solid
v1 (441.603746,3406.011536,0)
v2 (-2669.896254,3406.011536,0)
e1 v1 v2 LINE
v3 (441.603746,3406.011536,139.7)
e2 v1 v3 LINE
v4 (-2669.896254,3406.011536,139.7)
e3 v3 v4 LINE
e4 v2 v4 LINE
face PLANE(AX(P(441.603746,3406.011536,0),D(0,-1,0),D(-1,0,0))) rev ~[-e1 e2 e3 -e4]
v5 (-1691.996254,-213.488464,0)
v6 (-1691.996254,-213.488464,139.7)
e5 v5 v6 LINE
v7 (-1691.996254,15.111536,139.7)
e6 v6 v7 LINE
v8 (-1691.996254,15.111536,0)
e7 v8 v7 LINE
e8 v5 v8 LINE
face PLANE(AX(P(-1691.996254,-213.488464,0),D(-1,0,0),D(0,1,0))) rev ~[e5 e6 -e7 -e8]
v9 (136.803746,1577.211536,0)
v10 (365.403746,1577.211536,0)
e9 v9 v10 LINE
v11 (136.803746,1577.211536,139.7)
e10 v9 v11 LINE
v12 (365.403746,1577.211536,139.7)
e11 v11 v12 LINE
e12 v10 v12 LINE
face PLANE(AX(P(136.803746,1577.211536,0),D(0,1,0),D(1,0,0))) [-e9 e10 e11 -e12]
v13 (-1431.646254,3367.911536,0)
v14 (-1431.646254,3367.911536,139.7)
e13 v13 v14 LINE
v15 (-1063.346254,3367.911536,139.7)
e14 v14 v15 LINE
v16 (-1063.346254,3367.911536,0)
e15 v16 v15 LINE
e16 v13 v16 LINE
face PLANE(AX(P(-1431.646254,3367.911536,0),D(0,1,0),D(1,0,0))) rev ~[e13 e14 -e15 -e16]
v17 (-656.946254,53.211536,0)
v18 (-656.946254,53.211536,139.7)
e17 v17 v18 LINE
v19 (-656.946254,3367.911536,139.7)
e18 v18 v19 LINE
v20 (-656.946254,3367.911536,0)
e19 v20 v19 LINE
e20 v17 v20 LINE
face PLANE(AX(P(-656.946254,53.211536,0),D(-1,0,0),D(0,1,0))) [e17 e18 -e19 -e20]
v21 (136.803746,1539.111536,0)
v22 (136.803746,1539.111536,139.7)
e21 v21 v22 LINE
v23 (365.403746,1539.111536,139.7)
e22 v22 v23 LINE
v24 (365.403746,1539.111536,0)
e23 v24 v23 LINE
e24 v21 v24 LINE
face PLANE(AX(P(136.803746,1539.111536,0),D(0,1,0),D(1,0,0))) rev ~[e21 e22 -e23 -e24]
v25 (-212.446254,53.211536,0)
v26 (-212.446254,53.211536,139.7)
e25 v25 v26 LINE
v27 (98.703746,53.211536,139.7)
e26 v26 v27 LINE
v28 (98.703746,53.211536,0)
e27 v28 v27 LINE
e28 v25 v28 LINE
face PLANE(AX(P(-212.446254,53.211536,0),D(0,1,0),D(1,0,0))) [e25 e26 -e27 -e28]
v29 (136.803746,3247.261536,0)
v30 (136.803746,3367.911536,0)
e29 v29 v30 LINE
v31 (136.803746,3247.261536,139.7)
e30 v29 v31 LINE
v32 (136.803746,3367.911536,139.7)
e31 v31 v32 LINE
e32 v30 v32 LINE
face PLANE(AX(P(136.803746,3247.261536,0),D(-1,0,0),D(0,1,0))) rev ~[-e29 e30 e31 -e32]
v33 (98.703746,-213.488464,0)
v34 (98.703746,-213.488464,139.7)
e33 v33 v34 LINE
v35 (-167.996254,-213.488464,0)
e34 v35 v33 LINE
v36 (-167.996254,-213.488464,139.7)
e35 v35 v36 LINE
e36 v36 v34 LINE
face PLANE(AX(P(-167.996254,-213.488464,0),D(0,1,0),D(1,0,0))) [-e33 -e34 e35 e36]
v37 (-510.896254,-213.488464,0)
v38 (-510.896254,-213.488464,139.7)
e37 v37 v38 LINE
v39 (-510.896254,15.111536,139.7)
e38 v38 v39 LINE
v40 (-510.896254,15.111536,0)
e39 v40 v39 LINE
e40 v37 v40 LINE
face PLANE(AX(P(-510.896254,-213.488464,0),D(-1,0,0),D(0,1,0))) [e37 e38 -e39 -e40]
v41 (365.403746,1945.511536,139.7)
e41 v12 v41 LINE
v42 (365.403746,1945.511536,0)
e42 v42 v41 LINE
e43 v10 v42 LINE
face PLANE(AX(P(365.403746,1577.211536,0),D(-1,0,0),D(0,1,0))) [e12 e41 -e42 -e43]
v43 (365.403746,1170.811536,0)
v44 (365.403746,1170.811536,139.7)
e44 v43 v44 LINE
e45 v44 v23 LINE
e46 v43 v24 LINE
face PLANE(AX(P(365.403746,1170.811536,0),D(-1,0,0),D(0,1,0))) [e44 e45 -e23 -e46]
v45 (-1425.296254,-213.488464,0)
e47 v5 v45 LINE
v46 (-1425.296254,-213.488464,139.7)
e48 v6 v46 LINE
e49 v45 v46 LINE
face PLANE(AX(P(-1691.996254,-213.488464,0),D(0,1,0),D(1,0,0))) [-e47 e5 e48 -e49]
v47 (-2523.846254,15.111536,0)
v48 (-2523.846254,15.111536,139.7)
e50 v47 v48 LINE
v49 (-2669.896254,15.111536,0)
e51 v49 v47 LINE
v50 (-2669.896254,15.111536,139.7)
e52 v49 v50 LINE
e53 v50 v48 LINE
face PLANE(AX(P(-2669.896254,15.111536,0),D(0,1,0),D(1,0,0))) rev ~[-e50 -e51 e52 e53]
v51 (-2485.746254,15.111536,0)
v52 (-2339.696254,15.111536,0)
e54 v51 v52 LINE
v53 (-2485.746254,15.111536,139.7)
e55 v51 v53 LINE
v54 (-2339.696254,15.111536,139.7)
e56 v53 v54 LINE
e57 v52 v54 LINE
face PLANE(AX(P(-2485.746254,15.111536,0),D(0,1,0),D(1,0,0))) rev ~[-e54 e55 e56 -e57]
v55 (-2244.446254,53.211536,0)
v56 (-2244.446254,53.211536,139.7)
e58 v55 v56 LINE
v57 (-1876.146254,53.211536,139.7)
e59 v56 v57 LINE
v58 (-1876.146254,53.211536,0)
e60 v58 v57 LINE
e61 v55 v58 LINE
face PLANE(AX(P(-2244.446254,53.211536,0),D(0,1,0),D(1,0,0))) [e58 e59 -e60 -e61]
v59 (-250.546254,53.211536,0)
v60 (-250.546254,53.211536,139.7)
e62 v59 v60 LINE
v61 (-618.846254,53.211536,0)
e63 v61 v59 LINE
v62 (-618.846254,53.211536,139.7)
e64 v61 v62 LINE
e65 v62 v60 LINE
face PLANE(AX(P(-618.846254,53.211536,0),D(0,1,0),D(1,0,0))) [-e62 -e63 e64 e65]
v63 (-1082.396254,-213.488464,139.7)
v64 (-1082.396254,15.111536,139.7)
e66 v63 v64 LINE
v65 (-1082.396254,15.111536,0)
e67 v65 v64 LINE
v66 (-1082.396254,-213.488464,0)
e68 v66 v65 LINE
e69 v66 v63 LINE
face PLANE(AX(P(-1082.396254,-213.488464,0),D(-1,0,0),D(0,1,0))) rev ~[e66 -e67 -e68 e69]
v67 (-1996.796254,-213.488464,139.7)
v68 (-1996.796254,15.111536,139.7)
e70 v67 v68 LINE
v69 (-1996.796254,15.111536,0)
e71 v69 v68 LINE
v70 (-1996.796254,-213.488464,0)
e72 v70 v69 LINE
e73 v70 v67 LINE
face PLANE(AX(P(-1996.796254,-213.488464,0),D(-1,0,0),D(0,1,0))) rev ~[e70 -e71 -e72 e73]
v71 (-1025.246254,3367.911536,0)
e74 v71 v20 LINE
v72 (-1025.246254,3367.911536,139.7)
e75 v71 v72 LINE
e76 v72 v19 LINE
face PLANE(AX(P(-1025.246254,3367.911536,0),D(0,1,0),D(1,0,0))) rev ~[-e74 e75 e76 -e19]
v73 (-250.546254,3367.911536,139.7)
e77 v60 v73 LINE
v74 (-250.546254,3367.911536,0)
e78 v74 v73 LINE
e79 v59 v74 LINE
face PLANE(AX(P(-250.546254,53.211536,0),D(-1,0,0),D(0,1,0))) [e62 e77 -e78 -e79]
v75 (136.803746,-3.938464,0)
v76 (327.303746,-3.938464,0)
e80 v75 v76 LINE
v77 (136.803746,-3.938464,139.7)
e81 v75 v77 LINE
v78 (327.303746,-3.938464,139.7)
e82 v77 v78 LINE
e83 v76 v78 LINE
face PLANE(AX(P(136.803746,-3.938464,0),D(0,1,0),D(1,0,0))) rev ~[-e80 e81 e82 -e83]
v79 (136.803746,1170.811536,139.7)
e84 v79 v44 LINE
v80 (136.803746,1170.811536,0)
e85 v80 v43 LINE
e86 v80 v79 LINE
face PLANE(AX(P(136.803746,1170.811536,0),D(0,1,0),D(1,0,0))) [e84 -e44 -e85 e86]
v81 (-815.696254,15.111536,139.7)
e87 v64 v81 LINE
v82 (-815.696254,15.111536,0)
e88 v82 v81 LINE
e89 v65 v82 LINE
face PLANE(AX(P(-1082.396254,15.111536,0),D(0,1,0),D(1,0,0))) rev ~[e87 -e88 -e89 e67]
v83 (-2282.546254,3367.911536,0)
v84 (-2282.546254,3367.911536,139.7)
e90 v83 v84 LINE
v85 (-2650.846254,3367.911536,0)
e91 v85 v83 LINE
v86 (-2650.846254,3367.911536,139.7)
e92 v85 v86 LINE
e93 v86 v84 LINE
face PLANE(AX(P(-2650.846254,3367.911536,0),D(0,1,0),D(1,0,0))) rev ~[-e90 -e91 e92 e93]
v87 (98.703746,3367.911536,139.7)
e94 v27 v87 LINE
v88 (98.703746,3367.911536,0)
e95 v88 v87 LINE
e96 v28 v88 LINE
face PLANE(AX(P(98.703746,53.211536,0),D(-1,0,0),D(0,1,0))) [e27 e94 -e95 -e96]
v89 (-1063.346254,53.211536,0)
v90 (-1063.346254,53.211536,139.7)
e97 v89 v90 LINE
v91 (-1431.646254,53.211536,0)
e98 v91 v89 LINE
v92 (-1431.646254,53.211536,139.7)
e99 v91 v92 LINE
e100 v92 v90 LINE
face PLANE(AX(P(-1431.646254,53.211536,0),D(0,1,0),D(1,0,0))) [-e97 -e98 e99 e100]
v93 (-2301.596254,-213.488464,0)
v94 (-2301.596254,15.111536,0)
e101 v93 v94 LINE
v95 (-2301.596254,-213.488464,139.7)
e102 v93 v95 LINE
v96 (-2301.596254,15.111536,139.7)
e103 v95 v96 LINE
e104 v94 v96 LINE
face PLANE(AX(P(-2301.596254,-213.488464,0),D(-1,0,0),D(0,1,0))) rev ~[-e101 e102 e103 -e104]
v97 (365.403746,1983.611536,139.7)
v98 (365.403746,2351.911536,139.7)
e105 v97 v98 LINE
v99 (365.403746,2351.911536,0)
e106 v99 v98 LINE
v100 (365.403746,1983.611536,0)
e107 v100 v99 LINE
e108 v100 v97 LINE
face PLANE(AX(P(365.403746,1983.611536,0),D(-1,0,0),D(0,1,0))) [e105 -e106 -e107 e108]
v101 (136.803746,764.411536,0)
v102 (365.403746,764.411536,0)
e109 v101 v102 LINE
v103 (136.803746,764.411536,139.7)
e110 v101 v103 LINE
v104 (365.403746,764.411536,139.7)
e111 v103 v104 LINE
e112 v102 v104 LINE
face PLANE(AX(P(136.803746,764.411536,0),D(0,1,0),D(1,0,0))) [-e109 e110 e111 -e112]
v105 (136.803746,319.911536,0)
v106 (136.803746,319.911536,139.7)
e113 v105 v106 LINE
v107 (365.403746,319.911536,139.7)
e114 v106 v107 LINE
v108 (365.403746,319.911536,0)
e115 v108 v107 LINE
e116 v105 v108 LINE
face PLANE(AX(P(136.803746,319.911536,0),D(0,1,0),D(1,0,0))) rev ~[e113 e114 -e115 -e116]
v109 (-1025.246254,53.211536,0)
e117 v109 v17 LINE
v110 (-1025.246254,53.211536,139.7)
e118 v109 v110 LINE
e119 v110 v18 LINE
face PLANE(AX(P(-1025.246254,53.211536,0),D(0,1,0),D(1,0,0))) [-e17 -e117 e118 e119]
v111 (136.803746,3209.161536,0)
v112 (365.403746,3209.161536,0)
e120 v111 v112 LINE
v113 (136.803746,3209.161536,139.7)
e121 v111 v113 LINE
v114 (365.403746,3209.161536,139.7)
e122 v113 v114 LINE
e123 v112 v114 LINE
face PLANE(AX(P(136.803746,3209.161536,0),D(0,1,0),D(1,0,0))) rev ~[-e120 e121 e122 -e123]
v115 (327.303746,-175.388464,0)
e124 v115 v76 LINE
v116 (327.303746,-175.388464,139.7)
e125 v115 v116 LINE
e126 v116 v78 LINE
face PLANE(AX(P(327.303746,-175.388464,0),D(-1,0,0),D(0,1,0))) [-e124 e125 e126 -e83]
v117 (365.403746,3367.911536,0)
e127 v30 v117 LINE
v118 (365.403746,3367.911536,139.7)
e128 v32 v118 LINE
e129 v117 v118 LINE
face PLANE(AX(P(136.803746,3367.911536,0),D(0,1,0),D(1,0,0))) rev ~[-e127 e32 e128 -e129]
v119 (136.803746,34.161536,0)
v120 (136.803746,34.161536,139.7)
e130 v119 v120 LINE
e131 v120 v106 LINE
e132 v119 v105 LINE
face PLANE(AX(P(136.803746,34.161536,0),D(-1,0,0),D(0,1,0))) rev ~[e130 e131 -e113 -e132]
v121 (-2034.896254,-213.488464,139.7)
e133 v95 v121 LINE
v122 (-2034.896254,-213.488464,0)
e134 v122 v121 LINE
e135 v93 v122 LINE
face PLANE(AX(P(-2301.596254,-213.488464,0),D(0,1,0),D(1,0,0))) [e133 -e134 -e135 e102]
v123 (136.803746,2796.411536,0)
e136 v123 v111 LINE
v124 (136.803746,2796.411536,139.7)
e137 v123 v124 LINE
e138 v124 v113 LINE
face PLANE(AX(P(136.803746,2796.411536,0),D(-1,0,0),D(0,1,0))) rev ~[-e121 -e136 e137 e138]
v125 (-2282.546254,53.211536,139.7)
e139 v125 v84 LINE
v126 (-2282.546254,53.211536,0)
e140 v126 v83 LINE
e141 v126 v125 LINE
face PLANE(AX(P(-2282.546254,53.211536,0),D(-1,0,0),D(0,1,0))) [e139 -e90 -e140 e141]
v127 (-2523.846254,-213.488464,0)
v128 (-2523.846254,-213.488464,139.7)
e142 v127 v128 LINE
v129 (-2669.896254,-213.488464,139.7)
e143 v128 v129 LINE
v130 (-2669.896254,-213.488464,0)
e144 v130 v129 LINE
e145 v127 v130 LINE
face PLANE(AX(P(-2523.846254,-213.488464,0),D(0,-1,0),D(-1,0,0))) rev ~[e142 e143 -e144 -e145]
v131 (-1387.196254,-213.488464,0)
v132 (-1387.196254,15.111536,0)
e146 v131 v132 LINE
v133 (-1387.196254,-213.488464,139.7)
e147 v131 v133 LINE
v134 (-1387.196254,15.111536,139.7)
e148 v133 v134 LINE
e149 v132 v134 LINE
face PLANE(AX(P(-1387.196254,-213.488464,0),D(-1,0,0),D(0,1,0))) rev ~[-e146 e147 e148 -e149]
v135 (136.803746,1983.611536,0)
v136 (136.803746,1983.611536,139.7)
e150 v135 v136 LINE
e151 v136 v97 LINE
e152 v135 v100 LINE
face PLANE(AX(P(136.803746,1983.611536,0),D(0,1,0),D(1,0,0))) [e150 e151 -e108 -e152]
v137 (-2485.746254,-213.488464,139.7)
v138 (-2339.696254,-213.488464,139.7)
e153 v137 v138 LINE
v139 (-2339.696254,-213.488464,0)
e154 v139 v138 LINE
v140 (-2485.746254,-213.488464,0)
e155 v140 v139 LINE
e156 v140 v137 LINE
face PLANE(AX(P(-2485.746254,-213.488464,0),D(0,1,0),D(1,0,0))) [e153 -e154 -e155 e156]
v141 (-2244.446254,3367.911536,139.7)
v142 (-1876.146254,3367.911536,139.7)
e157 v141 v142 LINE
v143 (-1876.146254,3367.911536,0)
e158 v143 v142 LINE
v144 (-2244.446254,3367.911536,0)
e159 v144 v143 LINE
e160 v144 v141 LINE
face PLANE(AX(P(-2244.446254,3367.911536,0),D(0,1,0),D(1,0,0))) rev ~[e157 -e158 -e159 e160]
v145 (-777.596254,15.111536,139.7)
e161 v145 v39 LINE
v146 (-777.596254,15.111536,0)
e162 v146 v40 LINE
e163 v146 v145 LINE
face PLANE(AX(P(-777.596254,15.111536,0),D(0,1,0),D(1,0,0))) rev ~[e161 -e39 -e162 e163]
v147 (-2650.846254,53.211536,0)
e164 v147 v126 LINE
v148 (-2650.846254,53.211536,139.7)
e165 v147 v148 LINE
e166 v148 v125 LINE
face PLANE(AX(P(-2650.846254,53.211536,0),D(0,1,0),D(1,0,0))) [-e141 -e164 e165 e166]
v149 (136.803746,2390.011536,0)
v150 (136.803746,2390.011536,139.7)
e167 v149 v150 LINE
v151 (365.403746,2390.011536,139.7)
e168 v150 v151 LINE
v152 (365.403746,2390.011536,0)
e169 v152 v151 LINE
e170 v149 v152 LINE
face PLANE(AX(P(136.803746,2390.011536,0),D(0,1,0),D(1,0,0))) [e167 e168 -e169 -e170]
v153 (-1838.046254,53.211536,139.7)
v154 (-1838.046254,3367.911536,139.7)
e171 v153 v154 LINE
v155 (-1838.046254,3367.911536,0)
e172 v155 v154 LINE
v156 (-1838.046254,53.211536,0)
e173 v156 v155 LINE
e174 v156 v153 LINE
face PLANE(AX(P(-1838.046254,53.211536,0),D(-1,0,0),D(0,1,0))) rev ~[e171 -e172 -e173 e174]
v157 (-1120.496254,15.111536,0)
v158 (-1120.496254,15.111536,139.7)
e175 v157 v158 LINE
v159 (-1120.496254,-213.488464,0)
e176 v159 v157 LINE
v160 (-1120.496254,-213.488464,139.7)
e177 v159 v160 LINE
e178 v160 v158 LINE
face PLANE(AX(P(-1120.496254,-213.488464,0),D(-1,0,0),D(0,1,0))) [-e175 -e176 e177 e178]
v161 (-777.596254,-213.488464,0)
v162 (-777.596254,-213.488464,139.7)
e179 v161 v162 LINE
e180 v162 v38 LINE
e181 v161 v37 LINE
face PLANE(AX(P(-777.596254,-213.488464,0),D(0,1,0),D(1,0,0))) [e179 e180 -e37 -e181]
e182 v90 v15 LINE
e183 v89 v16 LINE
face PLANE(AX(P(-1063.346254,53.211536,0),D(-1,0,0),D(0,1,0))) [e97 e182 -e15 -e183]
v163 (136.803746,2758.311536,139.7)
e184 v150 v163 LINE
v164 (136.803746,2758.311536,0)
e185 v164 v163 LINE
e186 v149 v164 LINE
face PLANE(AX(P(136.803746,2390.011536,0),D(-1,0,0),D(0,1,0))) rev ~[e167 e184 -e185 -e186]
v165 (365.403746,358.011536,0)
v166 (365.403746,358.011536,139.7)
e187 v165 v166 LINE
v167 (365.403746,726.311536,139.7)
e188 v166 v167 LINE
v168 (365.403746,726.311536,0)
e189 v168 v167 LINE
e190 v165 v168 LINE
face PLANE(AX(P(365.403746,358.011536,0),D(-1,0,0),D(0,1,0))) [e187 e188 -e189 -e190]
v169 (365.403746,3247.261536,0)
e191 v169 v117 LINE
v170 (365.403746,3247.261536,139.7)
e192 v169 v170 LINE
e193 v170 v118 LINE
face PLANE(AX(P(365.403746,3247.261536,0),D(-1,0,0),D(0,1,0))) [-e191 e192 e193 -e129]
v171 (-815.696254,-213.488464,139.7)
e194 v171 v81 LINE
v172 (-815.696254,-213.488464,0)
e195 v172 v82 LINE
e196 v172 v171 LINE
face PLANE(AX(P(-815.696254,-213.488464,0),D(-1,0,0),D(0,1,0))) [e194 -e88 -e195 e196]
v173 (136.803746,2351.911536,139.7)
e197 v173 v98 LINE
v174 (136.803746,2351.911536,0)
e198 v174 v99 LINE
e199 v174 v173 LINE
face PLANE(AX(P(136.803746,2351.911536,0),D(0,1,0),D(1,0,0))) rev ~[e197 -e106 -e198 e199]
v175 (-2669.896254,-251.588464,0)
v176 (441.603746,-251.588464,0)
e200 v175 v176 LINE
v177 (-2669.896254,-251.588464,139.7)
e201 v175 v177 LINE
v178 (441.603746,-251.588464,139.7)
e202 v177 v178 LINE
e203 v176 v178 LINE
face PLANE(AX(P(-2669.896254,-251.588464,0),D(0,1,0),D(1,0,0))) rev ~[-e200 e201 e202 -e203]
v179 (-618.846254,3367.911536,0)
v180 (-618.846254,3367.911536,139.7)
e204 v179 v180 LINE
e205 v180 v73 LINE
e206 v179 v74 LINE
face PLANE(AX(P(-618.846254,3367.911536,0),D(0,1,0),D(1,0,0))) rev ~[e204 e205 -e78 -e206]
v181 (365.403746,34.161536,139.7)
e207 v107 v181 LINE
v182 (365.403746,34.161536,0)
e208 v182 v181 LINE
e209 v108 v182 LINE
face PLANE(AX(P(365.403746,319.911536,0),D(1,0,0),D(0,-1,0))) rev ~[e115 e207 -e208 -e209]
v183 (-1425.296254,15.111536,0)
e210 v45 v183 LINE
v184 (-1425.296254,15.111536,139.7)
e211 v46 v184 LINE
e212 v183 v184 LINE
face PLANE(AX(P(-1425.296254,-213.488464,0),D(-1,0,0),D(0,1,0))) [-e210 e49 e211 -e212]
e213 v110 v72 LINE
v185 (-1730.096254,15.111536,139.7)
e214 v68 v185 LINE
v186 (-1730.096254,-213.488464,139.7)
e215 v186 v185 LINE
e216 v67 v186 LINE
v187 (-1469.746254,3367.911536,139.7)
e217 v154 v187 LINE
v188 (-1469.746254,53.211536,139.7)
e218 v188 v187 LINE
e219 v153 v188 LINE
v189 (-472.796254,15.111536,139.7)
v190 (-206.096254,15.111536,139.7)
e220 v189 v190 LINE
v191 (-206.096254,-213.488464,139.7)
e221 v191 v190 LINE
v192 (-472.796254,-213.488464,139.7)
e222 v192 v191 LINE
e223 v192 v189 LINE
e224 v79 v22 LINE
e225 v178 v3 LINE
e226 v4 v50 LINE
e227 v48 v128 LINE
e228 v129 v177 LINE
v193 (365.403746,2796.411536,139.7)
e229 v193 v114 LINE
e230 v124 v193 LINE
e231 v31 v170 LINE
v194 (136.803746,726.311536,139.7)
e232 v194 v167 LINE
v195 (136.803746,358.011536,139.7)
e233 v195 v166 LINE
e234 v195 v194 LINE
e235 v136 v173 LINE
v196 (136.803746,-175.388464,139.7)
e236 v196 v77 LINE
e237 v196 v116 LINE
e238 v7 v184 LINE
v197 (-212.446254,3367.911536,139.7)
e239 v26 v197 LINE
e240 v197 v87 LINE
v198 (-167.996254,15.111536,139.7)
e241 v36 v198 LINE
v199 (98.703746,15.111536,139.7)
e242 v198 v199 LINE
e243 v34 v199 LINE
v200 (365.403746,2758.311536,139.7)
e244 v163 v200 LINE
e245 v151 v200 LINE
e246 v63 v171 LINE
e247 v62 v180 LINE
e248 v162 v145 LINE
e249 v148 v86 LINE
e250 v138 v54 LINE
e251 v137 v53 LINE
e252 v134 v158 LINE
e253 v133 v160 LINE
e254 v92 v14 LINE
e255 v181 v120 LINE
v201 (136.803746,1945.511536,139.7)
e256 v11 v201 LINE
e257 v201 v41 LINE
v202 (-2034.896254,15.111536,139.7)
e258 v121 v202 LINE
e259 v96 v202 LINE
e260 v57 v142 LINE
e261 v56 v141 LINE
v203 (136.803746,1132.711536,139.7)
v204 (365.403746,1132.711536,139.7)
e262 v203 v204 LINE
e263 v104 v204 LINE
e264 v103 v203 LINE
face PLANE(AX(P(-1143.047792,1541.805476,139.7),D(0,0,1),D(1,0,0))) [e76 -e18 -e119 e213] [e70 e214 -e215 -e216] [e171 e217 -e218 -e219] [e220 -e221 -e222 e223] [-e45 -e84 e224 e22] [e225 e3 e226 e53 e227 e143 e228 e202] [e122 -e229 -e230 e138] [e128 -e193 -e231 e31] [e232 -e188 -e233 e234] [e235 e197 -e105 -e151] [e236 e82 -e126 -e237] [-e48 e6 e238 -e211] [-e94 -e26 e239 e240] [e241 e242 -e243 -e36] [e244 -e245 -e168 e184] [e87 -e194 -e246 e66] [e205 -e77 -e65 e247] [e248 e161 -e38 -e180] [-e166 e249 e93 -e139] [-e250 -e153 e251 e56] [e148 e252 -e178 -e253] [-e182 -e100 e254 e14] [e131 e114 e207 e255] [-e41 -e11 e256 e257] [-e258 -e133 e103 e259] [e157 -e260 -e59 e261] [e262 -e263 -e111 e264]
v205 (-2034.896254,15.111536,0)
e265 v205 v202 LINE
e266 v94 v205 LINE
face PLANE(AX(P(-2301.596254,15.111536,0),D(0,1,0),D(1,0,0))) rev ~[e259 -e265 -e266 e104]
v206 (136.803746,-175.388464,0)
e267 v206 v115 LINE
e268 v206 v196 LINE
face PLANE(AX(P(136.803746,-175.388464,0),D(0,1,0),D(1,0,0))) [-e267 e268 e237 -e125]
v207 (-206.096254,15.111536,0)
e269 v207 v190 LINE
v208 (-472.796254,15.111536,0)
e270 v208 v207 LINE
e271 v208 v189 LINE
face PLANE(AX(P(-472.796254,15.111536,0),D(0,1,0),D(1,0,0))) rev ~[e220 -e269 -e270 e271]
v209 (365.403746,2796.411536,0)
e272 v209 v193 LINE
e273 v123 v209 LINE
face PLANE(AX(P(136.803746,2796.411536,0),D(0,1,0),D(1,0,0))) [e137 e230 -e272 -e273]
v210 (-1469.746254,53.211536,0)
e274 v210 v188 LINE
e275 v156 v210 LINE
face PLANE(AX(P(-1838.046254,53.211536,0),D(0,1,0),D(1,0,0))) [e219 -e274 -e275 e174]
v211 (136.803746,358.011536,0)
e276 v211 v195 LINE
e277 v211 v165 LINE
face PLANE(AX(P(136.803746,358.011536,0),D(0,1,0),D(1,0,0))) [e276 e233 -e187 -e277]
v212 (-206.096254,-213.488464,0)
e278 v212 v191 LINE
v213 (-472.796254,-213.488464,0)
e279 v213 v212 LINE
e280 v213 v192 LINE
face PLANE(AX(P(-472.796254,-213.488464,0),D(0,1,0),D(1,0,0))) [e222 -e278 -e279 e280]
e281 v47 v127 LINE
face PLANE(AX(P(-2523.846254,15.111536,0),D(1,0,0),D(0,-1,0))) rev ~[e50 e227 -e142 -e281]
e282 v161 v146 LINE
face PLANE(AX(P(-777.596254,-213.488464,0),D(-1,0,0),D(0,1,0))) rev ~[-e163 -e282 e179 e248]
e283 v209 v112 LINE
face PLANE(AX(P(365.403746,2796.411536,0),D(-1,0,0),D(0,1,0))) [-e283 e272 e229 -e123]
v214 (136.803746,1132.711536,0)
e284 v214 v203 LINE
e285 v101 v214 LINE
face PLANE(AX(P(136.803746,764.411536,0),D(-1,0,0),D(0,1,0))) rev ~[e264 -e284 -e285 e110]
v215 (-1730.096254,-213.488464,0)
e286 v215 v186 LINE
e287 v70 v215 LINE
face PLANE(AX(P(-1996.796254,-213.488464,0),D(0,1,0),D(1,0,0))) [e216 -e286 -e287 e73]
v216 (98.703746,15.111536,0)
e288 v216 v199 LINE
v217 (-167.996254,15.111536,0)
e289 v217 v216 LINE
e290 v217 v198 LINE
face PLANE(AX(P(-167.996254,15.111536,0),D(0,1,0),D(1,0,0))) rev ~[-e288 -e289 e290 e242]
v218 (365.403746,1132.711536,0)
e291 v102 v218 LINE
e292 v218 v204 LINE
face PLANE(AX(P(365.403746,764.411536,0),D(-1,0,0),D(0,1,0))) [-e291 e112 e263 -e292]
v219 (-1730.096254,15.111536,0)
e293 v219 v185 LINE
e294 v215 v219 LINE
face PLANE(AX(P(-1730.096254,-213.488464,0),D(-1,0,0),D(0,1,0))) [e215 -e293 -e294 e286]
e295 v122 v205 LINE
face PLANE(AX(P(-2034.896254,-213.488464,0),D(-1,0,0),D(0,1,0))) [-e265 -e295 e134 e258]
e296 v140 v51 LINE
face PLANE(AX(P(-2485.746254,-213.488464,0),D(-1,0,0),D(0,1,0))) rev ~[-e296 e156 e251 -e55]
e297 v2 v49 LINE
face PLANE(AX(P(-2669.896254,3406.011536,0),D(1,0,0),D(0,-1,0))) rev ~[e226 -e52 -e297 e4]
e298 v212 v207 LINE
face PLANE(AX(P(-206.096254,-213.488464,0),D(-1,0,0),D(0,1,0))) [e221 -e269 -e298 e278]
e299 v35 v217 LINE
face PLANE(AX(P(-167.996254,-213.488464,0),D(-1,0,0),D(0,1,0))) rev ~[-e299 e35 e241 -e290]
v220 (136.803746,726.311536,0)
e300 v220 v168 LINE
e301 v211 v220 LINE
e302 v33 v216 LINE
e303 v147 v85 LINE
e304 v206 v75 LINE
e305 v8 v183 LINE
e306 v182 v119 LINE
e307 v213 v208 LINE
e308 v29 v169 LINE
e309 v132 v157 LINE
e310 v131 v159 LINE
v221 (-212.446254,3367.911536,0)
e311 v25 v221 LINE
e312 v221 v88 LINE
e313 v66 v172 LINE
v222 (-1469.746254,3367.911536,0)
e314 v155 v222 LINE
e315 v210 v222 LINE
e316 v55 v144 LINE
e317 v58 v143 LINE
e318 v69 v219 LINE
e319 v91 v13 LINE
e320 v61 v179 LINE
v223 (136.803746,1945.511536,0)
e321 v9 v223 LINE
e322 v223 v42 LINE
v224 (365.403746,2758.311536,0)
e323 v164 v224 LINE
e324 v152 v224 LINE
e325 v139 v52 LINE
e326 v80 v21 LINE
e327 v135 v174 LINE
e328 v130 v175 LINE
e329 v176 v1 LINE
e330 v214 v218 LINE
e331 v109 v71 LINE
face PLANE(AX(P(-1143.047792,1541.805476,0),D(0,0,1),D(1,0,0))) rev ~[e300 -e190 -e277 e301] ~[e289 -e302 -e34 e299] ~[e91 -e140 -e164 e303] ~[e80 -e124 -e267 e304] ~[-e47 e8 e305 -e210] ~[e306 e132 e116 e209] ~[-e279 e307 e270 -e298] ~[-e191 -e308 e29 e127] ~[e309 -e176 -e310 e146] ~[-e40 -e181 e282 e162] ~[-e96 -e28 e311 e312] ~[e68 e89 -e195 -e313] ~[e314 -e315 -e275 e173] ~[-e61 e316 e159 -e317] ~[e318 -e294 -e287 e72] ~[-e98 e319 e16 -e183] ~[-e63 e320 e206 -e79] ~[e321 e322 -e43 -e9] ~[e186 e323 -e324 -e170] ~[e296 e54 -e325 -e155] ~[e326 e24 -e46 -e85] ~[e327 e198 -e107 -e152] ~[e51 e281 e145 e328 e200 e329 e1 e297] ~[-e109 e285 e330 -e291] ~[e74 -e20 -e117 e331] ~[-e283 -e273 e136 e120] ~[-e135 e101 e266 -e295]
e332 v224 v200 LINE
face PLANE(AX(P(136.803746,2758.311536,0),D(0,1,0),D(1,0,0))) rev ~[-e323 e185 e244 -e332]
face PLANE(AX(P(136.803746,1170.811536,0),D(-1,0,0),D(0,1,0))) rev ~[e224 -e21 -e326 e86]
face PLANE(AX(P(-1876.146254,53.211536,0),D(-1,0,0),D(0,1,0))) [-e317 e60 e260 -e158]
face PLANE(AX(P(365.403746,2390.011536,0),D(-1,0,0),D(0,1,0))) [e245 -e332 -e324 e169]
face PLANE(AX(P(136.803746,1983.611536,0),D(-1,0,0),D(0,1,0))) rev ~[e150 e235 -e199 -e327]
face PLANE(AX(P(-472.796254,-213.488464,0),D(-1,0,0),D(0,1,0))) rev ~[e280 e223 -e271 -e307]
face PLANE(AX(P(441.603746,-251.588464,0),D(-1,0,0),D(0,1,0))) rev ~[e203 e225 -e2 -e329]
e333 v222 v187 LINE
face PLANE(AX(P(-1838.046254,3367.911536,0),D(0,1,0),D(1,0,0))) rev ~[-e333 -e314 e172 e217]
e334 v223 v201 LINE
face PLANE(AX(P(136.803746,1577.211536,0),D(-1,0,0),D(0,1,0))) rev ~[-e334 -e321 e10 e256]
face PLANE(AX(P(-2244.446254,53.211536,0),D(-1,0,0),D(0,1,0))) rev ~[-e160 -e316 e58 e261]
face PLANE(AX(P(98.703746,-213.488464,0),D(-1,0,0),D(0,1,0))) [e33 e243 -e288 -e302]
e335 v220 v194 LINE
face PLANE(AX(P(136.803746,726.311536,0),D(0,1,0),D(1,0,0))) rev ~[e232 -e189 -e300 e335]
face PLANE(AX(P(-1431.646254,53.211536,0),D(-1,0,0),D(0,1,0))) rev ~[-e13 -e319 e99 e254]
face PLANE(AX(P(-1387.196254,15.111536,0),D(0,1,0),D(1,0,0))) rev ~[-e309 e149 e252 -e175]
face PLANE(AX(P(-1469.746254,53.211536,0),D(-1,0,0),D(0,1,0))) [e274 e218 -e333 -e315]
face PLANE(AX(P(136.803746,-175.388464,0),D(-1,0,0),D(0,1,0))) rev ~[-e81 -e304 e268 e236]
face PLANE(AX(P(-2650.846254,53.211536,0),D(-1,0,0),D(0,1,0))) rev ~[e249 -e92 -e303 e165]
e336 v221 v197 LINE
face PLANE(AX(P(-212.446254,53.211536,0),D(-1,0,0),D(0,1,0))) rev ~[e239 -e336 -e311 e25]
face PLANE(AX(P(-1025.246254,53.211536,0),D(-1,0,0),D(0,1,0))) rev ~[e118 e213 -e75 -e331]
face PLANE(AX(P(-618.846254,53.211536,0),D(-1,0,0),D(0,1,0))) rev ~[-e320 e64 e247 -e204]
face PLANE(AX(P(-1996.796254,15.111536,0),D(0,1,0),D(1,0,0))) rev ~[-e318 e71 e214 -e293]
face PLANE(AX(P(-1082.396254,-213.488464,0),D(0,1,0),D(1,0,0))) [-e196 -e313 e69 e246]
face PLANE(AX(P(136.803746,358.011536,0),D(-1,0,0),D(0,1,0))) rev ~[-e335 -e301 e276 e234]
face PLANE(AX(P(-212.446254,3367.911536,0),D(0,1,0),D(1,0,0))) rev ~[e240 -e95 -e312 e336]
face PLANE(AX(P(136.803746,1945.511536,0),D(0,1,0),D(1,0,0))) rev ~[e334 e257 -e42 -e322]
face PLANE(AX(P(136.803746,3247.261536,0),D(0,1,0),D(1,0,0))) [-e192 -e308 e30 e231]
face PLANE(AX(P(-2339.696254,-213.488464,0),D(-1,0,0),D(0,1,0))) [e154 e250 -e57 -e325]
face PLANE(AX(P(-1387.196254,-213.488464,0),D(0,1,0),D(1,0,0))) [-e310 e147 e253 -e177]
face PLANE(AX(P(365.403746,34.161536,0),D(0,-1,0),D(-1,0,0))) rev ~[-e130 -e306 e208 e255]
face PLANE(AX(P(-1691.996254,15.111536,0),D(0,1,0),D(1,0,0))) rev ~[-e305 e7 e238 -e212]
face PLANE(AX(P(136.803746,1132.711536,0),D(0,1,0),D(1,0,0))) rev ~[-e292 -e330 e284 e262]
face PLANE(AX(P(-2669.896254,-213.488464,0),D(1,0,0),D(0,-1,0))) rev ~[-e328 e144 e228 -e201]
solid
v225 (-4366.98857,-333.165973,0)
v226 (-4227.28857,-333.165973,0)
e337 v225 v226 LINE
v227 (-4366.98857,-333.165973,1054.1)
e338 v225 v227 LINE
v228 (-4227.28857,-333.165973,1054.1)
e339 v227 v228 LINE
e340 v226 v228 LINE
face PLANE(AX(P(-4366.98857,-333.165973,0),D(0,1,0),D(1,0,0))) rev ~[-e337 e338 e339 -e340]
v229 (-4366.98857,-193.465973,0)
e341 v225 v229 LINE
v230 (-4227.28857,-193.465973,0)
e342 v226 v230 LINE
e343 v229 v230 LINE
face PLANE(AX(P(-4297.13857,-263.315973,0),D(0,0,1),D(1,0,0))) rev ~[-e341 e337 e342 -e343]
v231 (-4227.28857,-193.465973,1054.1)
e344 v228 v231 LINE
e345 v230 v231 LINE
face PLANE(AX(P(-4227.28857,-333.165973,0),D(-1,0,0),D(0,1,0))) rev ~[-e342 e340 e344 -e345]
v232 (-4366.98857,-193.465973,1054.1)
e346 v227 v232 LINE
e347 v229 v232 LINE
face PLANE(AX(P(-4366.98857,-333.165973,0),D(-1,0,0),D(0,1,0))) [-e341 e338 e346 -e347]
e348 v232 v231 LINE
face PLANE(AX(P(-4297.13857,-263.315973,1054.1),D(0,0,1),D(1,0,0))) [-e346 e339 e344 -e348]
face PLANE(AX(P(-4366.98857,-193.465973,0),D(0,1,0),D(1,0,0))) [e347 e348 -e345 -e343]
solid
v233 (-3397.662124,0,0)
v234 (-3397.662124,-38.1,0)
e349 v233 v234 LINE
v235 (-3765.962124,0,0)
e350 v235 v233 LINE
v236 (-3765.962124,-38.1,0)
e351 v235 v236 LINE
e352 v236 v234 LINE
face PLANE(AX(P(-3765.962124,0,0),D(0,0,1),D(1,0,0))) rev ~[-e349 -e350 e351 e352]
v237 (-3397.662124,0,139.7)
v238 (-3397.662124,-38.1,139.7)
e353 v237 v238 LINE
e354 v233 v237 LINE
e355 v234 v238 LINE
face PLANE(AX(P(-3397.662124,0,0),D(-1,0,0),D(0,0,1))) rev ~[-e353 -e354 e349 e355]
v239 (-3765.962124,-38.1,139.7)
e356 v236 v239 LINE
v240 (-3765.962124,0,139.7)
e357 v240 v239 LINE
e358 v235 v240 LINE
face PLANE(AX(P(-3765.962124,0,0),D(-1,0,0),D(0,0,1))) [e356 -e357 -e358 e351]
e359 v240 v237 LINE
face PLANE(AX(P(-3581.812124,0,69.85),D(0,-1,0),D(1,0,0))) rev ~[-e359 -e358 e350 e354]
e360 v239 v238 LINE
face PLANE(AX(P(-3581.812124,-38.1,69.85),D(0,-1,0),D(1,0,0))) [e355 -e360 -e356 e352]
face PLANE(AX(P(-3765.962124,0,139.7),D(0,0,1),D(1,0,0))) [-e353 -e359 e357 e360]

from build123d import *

# Parameters (mm, degrees)
F0_W     = 146.05
F0_H     = 228.6
F0_W_2   = 266.7
F0_W_3   = 190.5
F0_H_2   = 171.45
F0_W_4   = 228.6
F0_H_3   = 368.3
F0_W_5   = 368.3
F0_H_4   = 3314.7
F0_W_6   = 311.15
F0_H_5   = 412.75
F0_H_6   = 120.65
F1_DEPTH = 139.7
F2_W     = 139.7
F2_H     = 139.7
F3_DEPTH = 1054.1
F4_W     = 368.3
F4_H     = 139.7
F5_DEPTH = 38.1


# Not quite as in the source:
# - a feature names something its author has since deleted; it is built from what else it names


with BuildPart() as f1:
    # F0 (on Top) → F1 (new body)
    with BuildSketch(Plane.XY):
        Polygon((403.5037457943, 3406.0115362167), (-2669.8962542057, 3406.0115362167), (-2669.8962542057, 3367.9115362167), (-2669.8962542057, 53.2115362167), (-2669.8962542057, 15.1115362167), (-2523.8462542057, 15.1115362167), (-2523.8462542057, -213.4884637833), (-2669.8962542057, -213.4884637833), (-2669.8962542057, -251.5884637833), (403.5037457943, -251.5884637833), (441.6037457943, -251.5884637833), (441.6037457943, 3406.0115362167), align=None)
        with Locations((-2412.7212542057, -99.1884637833)):
            Rectangle(F0_W, F0_H, mode=Mode.SUBTRACT)
        with Locations((-2168.2462542057, -99.1884637833)):
            Rectangle(F0_W_2, F0_H, mode=Mode.SUBTRACT)
        with Locations((-1863.4462542057, -99.1884637833)):
            Rectangle(F0_W_2, F0_H, mode=Mode.SUBTRACT)
        with Locations((-1558.6462542057, -99.1884637833)):
            Rectangle(F0_W_2, F0_H, mode=Mode.SUBTRACT)
        with Locations((-1253.8462542057, -99.1884637833)):
            Rectangle(F0_W_2, F0_H, mode=Mode.SUBTRACT)
        with Locations((-949.0462542057, -99.1884637833)):
            Rectangle(F0_W_2, F0_H, mode=Mode.SUBTRACT)
        with Locations((-644.2462542057, -99.1884637833)):
            Rectangle(F0_W_2, F0_H, mode=Mode.SUBTRACT)
        with Locations((-339.4462542057, -99.1884637833)):
            Rectangle(F0_W_2, F0_H, mode=Mode.SUBTRACT)
        with Locations((-34.6462542057, -99.1884637833)):
            Rectangle(F0_W_2, F0_H, mode=Mode.SUBTRACT)
        with Locations((232.0537457943, -89.6634637833)):
            Rectangle(F0_W_3, F0_H_2, mode=Mode.SUBTRACT)
        Polygon((365.4037457943, 319.9115362167), (365.4037457943, 65.9115362167), (365.4037457943, 53.2115362167), (365.4037457943, 34.1615362167), (136.8037457943, 34.1615362167), (136.8037457943, 53.2115362167), (136.8037457943, 65.9115362167), (136.8037457943, 319.9115362167), align=None, mode=Mode.SUBTRACT)
        with Locations((251.1037457943, 542.1615362167)):
            Rectangle(F0_W_4, F0_H_3, mode=Mode.SUBTRACT)
        with Locations((251.1037457943, 948.5615362167)):
            Rectangle(F0_W_4, F0_H_3, mode=Mode.SUBTRACT)
        with Locations((251.1037457943, 1354.9615362167)):
            Rectangle(F0_W_4, F0_H_3, mode=Mode.SUBTRACT)
        with Locations((-2466.6962542057, 1710.5615362167)):
            Rectangle(F0_W_5, F0_H_4, mode=Mode.SUBTRACT)
        with Locations((-2060.2962542057, 1710.5615362167)):
            Rectangle(F0_W_5, F0_H_4, mode=Mode.SUBTRACT)
        with Locations((-1653.8962542057, 1710.5615362167)):
            Rectangle(F0_W_5, F0_H_4, mode=Mode.SUBTRACT)
        with Locations((-1247.4962542057, 1710.5615362167)):
            Rectangle(F0_W_5, F0_H_4, mode=Mode.SUBTRACT)
        with Locations((-841.0962542057, 1710.5615362167)):
            Rectangle(F0_W_5, F0_H_4, mode=Mode.SUBTRACT)
        with Locations((-434.6962542057, 1710.5615362167)):
            Rectangle(F0_W_5, F0_H_4, mode=Mode.SUBTRACT)
        with Locations((-56.8712542057, 1710.5615362167)):
            Rectangle(F0_W_6, F0_H_4, mode=Mode.SUBTRACT)
        with Locations((251.1037457943, 1761.3615362167)):
            Rectangle(F0_W_4, F0_H_3, mode=Mode.SUBTRACT)
        with Locations((251.1037457943, 2167.7615362167)):
            Rectangle(F0_W_4, F0_H_3, mode=Mode.SUBTRACT)
        with Locations((251.1037457943, 2574.1615362167)):
            Rectangle(F0_W_4, F0_H_3, mode=Mode.SUBTRACT)
        with Locations((251.1037457943, 3002.7865362167)):
            Rectangle(F0_W_4, F0_H_5, mode=Mode.SUBTRACT)
        with Locations((251.1037457943, 3307.5865362167)):
            Rectangle(F0_W_4, F0_H_6, mode=Mode.SUBTRACT)
    extrude(amount=F1_DEPTH)


with BuildPart() as f3:
    # F2 (on Top) → F3 (new body)
    with BuildSketch(Plane.XY):
        with Locations((-4297.1385696411, -263.3159734249)):
            Rectangle(F2_W, F2_H)
    extrude(amount=F3_DEPTH)


with BuildPart() as f5:
    # F4 (on Front) → F5 (new body)
    with BuildSketch(Plane.XZ):
        with Locations((-3581.8121238708, 69.85)):
            Rectangle(F4_W, F4_H)
    extrude(amount=F5_DEPTH)


solid = Compound([f1.part, f3.part, f5.part])
